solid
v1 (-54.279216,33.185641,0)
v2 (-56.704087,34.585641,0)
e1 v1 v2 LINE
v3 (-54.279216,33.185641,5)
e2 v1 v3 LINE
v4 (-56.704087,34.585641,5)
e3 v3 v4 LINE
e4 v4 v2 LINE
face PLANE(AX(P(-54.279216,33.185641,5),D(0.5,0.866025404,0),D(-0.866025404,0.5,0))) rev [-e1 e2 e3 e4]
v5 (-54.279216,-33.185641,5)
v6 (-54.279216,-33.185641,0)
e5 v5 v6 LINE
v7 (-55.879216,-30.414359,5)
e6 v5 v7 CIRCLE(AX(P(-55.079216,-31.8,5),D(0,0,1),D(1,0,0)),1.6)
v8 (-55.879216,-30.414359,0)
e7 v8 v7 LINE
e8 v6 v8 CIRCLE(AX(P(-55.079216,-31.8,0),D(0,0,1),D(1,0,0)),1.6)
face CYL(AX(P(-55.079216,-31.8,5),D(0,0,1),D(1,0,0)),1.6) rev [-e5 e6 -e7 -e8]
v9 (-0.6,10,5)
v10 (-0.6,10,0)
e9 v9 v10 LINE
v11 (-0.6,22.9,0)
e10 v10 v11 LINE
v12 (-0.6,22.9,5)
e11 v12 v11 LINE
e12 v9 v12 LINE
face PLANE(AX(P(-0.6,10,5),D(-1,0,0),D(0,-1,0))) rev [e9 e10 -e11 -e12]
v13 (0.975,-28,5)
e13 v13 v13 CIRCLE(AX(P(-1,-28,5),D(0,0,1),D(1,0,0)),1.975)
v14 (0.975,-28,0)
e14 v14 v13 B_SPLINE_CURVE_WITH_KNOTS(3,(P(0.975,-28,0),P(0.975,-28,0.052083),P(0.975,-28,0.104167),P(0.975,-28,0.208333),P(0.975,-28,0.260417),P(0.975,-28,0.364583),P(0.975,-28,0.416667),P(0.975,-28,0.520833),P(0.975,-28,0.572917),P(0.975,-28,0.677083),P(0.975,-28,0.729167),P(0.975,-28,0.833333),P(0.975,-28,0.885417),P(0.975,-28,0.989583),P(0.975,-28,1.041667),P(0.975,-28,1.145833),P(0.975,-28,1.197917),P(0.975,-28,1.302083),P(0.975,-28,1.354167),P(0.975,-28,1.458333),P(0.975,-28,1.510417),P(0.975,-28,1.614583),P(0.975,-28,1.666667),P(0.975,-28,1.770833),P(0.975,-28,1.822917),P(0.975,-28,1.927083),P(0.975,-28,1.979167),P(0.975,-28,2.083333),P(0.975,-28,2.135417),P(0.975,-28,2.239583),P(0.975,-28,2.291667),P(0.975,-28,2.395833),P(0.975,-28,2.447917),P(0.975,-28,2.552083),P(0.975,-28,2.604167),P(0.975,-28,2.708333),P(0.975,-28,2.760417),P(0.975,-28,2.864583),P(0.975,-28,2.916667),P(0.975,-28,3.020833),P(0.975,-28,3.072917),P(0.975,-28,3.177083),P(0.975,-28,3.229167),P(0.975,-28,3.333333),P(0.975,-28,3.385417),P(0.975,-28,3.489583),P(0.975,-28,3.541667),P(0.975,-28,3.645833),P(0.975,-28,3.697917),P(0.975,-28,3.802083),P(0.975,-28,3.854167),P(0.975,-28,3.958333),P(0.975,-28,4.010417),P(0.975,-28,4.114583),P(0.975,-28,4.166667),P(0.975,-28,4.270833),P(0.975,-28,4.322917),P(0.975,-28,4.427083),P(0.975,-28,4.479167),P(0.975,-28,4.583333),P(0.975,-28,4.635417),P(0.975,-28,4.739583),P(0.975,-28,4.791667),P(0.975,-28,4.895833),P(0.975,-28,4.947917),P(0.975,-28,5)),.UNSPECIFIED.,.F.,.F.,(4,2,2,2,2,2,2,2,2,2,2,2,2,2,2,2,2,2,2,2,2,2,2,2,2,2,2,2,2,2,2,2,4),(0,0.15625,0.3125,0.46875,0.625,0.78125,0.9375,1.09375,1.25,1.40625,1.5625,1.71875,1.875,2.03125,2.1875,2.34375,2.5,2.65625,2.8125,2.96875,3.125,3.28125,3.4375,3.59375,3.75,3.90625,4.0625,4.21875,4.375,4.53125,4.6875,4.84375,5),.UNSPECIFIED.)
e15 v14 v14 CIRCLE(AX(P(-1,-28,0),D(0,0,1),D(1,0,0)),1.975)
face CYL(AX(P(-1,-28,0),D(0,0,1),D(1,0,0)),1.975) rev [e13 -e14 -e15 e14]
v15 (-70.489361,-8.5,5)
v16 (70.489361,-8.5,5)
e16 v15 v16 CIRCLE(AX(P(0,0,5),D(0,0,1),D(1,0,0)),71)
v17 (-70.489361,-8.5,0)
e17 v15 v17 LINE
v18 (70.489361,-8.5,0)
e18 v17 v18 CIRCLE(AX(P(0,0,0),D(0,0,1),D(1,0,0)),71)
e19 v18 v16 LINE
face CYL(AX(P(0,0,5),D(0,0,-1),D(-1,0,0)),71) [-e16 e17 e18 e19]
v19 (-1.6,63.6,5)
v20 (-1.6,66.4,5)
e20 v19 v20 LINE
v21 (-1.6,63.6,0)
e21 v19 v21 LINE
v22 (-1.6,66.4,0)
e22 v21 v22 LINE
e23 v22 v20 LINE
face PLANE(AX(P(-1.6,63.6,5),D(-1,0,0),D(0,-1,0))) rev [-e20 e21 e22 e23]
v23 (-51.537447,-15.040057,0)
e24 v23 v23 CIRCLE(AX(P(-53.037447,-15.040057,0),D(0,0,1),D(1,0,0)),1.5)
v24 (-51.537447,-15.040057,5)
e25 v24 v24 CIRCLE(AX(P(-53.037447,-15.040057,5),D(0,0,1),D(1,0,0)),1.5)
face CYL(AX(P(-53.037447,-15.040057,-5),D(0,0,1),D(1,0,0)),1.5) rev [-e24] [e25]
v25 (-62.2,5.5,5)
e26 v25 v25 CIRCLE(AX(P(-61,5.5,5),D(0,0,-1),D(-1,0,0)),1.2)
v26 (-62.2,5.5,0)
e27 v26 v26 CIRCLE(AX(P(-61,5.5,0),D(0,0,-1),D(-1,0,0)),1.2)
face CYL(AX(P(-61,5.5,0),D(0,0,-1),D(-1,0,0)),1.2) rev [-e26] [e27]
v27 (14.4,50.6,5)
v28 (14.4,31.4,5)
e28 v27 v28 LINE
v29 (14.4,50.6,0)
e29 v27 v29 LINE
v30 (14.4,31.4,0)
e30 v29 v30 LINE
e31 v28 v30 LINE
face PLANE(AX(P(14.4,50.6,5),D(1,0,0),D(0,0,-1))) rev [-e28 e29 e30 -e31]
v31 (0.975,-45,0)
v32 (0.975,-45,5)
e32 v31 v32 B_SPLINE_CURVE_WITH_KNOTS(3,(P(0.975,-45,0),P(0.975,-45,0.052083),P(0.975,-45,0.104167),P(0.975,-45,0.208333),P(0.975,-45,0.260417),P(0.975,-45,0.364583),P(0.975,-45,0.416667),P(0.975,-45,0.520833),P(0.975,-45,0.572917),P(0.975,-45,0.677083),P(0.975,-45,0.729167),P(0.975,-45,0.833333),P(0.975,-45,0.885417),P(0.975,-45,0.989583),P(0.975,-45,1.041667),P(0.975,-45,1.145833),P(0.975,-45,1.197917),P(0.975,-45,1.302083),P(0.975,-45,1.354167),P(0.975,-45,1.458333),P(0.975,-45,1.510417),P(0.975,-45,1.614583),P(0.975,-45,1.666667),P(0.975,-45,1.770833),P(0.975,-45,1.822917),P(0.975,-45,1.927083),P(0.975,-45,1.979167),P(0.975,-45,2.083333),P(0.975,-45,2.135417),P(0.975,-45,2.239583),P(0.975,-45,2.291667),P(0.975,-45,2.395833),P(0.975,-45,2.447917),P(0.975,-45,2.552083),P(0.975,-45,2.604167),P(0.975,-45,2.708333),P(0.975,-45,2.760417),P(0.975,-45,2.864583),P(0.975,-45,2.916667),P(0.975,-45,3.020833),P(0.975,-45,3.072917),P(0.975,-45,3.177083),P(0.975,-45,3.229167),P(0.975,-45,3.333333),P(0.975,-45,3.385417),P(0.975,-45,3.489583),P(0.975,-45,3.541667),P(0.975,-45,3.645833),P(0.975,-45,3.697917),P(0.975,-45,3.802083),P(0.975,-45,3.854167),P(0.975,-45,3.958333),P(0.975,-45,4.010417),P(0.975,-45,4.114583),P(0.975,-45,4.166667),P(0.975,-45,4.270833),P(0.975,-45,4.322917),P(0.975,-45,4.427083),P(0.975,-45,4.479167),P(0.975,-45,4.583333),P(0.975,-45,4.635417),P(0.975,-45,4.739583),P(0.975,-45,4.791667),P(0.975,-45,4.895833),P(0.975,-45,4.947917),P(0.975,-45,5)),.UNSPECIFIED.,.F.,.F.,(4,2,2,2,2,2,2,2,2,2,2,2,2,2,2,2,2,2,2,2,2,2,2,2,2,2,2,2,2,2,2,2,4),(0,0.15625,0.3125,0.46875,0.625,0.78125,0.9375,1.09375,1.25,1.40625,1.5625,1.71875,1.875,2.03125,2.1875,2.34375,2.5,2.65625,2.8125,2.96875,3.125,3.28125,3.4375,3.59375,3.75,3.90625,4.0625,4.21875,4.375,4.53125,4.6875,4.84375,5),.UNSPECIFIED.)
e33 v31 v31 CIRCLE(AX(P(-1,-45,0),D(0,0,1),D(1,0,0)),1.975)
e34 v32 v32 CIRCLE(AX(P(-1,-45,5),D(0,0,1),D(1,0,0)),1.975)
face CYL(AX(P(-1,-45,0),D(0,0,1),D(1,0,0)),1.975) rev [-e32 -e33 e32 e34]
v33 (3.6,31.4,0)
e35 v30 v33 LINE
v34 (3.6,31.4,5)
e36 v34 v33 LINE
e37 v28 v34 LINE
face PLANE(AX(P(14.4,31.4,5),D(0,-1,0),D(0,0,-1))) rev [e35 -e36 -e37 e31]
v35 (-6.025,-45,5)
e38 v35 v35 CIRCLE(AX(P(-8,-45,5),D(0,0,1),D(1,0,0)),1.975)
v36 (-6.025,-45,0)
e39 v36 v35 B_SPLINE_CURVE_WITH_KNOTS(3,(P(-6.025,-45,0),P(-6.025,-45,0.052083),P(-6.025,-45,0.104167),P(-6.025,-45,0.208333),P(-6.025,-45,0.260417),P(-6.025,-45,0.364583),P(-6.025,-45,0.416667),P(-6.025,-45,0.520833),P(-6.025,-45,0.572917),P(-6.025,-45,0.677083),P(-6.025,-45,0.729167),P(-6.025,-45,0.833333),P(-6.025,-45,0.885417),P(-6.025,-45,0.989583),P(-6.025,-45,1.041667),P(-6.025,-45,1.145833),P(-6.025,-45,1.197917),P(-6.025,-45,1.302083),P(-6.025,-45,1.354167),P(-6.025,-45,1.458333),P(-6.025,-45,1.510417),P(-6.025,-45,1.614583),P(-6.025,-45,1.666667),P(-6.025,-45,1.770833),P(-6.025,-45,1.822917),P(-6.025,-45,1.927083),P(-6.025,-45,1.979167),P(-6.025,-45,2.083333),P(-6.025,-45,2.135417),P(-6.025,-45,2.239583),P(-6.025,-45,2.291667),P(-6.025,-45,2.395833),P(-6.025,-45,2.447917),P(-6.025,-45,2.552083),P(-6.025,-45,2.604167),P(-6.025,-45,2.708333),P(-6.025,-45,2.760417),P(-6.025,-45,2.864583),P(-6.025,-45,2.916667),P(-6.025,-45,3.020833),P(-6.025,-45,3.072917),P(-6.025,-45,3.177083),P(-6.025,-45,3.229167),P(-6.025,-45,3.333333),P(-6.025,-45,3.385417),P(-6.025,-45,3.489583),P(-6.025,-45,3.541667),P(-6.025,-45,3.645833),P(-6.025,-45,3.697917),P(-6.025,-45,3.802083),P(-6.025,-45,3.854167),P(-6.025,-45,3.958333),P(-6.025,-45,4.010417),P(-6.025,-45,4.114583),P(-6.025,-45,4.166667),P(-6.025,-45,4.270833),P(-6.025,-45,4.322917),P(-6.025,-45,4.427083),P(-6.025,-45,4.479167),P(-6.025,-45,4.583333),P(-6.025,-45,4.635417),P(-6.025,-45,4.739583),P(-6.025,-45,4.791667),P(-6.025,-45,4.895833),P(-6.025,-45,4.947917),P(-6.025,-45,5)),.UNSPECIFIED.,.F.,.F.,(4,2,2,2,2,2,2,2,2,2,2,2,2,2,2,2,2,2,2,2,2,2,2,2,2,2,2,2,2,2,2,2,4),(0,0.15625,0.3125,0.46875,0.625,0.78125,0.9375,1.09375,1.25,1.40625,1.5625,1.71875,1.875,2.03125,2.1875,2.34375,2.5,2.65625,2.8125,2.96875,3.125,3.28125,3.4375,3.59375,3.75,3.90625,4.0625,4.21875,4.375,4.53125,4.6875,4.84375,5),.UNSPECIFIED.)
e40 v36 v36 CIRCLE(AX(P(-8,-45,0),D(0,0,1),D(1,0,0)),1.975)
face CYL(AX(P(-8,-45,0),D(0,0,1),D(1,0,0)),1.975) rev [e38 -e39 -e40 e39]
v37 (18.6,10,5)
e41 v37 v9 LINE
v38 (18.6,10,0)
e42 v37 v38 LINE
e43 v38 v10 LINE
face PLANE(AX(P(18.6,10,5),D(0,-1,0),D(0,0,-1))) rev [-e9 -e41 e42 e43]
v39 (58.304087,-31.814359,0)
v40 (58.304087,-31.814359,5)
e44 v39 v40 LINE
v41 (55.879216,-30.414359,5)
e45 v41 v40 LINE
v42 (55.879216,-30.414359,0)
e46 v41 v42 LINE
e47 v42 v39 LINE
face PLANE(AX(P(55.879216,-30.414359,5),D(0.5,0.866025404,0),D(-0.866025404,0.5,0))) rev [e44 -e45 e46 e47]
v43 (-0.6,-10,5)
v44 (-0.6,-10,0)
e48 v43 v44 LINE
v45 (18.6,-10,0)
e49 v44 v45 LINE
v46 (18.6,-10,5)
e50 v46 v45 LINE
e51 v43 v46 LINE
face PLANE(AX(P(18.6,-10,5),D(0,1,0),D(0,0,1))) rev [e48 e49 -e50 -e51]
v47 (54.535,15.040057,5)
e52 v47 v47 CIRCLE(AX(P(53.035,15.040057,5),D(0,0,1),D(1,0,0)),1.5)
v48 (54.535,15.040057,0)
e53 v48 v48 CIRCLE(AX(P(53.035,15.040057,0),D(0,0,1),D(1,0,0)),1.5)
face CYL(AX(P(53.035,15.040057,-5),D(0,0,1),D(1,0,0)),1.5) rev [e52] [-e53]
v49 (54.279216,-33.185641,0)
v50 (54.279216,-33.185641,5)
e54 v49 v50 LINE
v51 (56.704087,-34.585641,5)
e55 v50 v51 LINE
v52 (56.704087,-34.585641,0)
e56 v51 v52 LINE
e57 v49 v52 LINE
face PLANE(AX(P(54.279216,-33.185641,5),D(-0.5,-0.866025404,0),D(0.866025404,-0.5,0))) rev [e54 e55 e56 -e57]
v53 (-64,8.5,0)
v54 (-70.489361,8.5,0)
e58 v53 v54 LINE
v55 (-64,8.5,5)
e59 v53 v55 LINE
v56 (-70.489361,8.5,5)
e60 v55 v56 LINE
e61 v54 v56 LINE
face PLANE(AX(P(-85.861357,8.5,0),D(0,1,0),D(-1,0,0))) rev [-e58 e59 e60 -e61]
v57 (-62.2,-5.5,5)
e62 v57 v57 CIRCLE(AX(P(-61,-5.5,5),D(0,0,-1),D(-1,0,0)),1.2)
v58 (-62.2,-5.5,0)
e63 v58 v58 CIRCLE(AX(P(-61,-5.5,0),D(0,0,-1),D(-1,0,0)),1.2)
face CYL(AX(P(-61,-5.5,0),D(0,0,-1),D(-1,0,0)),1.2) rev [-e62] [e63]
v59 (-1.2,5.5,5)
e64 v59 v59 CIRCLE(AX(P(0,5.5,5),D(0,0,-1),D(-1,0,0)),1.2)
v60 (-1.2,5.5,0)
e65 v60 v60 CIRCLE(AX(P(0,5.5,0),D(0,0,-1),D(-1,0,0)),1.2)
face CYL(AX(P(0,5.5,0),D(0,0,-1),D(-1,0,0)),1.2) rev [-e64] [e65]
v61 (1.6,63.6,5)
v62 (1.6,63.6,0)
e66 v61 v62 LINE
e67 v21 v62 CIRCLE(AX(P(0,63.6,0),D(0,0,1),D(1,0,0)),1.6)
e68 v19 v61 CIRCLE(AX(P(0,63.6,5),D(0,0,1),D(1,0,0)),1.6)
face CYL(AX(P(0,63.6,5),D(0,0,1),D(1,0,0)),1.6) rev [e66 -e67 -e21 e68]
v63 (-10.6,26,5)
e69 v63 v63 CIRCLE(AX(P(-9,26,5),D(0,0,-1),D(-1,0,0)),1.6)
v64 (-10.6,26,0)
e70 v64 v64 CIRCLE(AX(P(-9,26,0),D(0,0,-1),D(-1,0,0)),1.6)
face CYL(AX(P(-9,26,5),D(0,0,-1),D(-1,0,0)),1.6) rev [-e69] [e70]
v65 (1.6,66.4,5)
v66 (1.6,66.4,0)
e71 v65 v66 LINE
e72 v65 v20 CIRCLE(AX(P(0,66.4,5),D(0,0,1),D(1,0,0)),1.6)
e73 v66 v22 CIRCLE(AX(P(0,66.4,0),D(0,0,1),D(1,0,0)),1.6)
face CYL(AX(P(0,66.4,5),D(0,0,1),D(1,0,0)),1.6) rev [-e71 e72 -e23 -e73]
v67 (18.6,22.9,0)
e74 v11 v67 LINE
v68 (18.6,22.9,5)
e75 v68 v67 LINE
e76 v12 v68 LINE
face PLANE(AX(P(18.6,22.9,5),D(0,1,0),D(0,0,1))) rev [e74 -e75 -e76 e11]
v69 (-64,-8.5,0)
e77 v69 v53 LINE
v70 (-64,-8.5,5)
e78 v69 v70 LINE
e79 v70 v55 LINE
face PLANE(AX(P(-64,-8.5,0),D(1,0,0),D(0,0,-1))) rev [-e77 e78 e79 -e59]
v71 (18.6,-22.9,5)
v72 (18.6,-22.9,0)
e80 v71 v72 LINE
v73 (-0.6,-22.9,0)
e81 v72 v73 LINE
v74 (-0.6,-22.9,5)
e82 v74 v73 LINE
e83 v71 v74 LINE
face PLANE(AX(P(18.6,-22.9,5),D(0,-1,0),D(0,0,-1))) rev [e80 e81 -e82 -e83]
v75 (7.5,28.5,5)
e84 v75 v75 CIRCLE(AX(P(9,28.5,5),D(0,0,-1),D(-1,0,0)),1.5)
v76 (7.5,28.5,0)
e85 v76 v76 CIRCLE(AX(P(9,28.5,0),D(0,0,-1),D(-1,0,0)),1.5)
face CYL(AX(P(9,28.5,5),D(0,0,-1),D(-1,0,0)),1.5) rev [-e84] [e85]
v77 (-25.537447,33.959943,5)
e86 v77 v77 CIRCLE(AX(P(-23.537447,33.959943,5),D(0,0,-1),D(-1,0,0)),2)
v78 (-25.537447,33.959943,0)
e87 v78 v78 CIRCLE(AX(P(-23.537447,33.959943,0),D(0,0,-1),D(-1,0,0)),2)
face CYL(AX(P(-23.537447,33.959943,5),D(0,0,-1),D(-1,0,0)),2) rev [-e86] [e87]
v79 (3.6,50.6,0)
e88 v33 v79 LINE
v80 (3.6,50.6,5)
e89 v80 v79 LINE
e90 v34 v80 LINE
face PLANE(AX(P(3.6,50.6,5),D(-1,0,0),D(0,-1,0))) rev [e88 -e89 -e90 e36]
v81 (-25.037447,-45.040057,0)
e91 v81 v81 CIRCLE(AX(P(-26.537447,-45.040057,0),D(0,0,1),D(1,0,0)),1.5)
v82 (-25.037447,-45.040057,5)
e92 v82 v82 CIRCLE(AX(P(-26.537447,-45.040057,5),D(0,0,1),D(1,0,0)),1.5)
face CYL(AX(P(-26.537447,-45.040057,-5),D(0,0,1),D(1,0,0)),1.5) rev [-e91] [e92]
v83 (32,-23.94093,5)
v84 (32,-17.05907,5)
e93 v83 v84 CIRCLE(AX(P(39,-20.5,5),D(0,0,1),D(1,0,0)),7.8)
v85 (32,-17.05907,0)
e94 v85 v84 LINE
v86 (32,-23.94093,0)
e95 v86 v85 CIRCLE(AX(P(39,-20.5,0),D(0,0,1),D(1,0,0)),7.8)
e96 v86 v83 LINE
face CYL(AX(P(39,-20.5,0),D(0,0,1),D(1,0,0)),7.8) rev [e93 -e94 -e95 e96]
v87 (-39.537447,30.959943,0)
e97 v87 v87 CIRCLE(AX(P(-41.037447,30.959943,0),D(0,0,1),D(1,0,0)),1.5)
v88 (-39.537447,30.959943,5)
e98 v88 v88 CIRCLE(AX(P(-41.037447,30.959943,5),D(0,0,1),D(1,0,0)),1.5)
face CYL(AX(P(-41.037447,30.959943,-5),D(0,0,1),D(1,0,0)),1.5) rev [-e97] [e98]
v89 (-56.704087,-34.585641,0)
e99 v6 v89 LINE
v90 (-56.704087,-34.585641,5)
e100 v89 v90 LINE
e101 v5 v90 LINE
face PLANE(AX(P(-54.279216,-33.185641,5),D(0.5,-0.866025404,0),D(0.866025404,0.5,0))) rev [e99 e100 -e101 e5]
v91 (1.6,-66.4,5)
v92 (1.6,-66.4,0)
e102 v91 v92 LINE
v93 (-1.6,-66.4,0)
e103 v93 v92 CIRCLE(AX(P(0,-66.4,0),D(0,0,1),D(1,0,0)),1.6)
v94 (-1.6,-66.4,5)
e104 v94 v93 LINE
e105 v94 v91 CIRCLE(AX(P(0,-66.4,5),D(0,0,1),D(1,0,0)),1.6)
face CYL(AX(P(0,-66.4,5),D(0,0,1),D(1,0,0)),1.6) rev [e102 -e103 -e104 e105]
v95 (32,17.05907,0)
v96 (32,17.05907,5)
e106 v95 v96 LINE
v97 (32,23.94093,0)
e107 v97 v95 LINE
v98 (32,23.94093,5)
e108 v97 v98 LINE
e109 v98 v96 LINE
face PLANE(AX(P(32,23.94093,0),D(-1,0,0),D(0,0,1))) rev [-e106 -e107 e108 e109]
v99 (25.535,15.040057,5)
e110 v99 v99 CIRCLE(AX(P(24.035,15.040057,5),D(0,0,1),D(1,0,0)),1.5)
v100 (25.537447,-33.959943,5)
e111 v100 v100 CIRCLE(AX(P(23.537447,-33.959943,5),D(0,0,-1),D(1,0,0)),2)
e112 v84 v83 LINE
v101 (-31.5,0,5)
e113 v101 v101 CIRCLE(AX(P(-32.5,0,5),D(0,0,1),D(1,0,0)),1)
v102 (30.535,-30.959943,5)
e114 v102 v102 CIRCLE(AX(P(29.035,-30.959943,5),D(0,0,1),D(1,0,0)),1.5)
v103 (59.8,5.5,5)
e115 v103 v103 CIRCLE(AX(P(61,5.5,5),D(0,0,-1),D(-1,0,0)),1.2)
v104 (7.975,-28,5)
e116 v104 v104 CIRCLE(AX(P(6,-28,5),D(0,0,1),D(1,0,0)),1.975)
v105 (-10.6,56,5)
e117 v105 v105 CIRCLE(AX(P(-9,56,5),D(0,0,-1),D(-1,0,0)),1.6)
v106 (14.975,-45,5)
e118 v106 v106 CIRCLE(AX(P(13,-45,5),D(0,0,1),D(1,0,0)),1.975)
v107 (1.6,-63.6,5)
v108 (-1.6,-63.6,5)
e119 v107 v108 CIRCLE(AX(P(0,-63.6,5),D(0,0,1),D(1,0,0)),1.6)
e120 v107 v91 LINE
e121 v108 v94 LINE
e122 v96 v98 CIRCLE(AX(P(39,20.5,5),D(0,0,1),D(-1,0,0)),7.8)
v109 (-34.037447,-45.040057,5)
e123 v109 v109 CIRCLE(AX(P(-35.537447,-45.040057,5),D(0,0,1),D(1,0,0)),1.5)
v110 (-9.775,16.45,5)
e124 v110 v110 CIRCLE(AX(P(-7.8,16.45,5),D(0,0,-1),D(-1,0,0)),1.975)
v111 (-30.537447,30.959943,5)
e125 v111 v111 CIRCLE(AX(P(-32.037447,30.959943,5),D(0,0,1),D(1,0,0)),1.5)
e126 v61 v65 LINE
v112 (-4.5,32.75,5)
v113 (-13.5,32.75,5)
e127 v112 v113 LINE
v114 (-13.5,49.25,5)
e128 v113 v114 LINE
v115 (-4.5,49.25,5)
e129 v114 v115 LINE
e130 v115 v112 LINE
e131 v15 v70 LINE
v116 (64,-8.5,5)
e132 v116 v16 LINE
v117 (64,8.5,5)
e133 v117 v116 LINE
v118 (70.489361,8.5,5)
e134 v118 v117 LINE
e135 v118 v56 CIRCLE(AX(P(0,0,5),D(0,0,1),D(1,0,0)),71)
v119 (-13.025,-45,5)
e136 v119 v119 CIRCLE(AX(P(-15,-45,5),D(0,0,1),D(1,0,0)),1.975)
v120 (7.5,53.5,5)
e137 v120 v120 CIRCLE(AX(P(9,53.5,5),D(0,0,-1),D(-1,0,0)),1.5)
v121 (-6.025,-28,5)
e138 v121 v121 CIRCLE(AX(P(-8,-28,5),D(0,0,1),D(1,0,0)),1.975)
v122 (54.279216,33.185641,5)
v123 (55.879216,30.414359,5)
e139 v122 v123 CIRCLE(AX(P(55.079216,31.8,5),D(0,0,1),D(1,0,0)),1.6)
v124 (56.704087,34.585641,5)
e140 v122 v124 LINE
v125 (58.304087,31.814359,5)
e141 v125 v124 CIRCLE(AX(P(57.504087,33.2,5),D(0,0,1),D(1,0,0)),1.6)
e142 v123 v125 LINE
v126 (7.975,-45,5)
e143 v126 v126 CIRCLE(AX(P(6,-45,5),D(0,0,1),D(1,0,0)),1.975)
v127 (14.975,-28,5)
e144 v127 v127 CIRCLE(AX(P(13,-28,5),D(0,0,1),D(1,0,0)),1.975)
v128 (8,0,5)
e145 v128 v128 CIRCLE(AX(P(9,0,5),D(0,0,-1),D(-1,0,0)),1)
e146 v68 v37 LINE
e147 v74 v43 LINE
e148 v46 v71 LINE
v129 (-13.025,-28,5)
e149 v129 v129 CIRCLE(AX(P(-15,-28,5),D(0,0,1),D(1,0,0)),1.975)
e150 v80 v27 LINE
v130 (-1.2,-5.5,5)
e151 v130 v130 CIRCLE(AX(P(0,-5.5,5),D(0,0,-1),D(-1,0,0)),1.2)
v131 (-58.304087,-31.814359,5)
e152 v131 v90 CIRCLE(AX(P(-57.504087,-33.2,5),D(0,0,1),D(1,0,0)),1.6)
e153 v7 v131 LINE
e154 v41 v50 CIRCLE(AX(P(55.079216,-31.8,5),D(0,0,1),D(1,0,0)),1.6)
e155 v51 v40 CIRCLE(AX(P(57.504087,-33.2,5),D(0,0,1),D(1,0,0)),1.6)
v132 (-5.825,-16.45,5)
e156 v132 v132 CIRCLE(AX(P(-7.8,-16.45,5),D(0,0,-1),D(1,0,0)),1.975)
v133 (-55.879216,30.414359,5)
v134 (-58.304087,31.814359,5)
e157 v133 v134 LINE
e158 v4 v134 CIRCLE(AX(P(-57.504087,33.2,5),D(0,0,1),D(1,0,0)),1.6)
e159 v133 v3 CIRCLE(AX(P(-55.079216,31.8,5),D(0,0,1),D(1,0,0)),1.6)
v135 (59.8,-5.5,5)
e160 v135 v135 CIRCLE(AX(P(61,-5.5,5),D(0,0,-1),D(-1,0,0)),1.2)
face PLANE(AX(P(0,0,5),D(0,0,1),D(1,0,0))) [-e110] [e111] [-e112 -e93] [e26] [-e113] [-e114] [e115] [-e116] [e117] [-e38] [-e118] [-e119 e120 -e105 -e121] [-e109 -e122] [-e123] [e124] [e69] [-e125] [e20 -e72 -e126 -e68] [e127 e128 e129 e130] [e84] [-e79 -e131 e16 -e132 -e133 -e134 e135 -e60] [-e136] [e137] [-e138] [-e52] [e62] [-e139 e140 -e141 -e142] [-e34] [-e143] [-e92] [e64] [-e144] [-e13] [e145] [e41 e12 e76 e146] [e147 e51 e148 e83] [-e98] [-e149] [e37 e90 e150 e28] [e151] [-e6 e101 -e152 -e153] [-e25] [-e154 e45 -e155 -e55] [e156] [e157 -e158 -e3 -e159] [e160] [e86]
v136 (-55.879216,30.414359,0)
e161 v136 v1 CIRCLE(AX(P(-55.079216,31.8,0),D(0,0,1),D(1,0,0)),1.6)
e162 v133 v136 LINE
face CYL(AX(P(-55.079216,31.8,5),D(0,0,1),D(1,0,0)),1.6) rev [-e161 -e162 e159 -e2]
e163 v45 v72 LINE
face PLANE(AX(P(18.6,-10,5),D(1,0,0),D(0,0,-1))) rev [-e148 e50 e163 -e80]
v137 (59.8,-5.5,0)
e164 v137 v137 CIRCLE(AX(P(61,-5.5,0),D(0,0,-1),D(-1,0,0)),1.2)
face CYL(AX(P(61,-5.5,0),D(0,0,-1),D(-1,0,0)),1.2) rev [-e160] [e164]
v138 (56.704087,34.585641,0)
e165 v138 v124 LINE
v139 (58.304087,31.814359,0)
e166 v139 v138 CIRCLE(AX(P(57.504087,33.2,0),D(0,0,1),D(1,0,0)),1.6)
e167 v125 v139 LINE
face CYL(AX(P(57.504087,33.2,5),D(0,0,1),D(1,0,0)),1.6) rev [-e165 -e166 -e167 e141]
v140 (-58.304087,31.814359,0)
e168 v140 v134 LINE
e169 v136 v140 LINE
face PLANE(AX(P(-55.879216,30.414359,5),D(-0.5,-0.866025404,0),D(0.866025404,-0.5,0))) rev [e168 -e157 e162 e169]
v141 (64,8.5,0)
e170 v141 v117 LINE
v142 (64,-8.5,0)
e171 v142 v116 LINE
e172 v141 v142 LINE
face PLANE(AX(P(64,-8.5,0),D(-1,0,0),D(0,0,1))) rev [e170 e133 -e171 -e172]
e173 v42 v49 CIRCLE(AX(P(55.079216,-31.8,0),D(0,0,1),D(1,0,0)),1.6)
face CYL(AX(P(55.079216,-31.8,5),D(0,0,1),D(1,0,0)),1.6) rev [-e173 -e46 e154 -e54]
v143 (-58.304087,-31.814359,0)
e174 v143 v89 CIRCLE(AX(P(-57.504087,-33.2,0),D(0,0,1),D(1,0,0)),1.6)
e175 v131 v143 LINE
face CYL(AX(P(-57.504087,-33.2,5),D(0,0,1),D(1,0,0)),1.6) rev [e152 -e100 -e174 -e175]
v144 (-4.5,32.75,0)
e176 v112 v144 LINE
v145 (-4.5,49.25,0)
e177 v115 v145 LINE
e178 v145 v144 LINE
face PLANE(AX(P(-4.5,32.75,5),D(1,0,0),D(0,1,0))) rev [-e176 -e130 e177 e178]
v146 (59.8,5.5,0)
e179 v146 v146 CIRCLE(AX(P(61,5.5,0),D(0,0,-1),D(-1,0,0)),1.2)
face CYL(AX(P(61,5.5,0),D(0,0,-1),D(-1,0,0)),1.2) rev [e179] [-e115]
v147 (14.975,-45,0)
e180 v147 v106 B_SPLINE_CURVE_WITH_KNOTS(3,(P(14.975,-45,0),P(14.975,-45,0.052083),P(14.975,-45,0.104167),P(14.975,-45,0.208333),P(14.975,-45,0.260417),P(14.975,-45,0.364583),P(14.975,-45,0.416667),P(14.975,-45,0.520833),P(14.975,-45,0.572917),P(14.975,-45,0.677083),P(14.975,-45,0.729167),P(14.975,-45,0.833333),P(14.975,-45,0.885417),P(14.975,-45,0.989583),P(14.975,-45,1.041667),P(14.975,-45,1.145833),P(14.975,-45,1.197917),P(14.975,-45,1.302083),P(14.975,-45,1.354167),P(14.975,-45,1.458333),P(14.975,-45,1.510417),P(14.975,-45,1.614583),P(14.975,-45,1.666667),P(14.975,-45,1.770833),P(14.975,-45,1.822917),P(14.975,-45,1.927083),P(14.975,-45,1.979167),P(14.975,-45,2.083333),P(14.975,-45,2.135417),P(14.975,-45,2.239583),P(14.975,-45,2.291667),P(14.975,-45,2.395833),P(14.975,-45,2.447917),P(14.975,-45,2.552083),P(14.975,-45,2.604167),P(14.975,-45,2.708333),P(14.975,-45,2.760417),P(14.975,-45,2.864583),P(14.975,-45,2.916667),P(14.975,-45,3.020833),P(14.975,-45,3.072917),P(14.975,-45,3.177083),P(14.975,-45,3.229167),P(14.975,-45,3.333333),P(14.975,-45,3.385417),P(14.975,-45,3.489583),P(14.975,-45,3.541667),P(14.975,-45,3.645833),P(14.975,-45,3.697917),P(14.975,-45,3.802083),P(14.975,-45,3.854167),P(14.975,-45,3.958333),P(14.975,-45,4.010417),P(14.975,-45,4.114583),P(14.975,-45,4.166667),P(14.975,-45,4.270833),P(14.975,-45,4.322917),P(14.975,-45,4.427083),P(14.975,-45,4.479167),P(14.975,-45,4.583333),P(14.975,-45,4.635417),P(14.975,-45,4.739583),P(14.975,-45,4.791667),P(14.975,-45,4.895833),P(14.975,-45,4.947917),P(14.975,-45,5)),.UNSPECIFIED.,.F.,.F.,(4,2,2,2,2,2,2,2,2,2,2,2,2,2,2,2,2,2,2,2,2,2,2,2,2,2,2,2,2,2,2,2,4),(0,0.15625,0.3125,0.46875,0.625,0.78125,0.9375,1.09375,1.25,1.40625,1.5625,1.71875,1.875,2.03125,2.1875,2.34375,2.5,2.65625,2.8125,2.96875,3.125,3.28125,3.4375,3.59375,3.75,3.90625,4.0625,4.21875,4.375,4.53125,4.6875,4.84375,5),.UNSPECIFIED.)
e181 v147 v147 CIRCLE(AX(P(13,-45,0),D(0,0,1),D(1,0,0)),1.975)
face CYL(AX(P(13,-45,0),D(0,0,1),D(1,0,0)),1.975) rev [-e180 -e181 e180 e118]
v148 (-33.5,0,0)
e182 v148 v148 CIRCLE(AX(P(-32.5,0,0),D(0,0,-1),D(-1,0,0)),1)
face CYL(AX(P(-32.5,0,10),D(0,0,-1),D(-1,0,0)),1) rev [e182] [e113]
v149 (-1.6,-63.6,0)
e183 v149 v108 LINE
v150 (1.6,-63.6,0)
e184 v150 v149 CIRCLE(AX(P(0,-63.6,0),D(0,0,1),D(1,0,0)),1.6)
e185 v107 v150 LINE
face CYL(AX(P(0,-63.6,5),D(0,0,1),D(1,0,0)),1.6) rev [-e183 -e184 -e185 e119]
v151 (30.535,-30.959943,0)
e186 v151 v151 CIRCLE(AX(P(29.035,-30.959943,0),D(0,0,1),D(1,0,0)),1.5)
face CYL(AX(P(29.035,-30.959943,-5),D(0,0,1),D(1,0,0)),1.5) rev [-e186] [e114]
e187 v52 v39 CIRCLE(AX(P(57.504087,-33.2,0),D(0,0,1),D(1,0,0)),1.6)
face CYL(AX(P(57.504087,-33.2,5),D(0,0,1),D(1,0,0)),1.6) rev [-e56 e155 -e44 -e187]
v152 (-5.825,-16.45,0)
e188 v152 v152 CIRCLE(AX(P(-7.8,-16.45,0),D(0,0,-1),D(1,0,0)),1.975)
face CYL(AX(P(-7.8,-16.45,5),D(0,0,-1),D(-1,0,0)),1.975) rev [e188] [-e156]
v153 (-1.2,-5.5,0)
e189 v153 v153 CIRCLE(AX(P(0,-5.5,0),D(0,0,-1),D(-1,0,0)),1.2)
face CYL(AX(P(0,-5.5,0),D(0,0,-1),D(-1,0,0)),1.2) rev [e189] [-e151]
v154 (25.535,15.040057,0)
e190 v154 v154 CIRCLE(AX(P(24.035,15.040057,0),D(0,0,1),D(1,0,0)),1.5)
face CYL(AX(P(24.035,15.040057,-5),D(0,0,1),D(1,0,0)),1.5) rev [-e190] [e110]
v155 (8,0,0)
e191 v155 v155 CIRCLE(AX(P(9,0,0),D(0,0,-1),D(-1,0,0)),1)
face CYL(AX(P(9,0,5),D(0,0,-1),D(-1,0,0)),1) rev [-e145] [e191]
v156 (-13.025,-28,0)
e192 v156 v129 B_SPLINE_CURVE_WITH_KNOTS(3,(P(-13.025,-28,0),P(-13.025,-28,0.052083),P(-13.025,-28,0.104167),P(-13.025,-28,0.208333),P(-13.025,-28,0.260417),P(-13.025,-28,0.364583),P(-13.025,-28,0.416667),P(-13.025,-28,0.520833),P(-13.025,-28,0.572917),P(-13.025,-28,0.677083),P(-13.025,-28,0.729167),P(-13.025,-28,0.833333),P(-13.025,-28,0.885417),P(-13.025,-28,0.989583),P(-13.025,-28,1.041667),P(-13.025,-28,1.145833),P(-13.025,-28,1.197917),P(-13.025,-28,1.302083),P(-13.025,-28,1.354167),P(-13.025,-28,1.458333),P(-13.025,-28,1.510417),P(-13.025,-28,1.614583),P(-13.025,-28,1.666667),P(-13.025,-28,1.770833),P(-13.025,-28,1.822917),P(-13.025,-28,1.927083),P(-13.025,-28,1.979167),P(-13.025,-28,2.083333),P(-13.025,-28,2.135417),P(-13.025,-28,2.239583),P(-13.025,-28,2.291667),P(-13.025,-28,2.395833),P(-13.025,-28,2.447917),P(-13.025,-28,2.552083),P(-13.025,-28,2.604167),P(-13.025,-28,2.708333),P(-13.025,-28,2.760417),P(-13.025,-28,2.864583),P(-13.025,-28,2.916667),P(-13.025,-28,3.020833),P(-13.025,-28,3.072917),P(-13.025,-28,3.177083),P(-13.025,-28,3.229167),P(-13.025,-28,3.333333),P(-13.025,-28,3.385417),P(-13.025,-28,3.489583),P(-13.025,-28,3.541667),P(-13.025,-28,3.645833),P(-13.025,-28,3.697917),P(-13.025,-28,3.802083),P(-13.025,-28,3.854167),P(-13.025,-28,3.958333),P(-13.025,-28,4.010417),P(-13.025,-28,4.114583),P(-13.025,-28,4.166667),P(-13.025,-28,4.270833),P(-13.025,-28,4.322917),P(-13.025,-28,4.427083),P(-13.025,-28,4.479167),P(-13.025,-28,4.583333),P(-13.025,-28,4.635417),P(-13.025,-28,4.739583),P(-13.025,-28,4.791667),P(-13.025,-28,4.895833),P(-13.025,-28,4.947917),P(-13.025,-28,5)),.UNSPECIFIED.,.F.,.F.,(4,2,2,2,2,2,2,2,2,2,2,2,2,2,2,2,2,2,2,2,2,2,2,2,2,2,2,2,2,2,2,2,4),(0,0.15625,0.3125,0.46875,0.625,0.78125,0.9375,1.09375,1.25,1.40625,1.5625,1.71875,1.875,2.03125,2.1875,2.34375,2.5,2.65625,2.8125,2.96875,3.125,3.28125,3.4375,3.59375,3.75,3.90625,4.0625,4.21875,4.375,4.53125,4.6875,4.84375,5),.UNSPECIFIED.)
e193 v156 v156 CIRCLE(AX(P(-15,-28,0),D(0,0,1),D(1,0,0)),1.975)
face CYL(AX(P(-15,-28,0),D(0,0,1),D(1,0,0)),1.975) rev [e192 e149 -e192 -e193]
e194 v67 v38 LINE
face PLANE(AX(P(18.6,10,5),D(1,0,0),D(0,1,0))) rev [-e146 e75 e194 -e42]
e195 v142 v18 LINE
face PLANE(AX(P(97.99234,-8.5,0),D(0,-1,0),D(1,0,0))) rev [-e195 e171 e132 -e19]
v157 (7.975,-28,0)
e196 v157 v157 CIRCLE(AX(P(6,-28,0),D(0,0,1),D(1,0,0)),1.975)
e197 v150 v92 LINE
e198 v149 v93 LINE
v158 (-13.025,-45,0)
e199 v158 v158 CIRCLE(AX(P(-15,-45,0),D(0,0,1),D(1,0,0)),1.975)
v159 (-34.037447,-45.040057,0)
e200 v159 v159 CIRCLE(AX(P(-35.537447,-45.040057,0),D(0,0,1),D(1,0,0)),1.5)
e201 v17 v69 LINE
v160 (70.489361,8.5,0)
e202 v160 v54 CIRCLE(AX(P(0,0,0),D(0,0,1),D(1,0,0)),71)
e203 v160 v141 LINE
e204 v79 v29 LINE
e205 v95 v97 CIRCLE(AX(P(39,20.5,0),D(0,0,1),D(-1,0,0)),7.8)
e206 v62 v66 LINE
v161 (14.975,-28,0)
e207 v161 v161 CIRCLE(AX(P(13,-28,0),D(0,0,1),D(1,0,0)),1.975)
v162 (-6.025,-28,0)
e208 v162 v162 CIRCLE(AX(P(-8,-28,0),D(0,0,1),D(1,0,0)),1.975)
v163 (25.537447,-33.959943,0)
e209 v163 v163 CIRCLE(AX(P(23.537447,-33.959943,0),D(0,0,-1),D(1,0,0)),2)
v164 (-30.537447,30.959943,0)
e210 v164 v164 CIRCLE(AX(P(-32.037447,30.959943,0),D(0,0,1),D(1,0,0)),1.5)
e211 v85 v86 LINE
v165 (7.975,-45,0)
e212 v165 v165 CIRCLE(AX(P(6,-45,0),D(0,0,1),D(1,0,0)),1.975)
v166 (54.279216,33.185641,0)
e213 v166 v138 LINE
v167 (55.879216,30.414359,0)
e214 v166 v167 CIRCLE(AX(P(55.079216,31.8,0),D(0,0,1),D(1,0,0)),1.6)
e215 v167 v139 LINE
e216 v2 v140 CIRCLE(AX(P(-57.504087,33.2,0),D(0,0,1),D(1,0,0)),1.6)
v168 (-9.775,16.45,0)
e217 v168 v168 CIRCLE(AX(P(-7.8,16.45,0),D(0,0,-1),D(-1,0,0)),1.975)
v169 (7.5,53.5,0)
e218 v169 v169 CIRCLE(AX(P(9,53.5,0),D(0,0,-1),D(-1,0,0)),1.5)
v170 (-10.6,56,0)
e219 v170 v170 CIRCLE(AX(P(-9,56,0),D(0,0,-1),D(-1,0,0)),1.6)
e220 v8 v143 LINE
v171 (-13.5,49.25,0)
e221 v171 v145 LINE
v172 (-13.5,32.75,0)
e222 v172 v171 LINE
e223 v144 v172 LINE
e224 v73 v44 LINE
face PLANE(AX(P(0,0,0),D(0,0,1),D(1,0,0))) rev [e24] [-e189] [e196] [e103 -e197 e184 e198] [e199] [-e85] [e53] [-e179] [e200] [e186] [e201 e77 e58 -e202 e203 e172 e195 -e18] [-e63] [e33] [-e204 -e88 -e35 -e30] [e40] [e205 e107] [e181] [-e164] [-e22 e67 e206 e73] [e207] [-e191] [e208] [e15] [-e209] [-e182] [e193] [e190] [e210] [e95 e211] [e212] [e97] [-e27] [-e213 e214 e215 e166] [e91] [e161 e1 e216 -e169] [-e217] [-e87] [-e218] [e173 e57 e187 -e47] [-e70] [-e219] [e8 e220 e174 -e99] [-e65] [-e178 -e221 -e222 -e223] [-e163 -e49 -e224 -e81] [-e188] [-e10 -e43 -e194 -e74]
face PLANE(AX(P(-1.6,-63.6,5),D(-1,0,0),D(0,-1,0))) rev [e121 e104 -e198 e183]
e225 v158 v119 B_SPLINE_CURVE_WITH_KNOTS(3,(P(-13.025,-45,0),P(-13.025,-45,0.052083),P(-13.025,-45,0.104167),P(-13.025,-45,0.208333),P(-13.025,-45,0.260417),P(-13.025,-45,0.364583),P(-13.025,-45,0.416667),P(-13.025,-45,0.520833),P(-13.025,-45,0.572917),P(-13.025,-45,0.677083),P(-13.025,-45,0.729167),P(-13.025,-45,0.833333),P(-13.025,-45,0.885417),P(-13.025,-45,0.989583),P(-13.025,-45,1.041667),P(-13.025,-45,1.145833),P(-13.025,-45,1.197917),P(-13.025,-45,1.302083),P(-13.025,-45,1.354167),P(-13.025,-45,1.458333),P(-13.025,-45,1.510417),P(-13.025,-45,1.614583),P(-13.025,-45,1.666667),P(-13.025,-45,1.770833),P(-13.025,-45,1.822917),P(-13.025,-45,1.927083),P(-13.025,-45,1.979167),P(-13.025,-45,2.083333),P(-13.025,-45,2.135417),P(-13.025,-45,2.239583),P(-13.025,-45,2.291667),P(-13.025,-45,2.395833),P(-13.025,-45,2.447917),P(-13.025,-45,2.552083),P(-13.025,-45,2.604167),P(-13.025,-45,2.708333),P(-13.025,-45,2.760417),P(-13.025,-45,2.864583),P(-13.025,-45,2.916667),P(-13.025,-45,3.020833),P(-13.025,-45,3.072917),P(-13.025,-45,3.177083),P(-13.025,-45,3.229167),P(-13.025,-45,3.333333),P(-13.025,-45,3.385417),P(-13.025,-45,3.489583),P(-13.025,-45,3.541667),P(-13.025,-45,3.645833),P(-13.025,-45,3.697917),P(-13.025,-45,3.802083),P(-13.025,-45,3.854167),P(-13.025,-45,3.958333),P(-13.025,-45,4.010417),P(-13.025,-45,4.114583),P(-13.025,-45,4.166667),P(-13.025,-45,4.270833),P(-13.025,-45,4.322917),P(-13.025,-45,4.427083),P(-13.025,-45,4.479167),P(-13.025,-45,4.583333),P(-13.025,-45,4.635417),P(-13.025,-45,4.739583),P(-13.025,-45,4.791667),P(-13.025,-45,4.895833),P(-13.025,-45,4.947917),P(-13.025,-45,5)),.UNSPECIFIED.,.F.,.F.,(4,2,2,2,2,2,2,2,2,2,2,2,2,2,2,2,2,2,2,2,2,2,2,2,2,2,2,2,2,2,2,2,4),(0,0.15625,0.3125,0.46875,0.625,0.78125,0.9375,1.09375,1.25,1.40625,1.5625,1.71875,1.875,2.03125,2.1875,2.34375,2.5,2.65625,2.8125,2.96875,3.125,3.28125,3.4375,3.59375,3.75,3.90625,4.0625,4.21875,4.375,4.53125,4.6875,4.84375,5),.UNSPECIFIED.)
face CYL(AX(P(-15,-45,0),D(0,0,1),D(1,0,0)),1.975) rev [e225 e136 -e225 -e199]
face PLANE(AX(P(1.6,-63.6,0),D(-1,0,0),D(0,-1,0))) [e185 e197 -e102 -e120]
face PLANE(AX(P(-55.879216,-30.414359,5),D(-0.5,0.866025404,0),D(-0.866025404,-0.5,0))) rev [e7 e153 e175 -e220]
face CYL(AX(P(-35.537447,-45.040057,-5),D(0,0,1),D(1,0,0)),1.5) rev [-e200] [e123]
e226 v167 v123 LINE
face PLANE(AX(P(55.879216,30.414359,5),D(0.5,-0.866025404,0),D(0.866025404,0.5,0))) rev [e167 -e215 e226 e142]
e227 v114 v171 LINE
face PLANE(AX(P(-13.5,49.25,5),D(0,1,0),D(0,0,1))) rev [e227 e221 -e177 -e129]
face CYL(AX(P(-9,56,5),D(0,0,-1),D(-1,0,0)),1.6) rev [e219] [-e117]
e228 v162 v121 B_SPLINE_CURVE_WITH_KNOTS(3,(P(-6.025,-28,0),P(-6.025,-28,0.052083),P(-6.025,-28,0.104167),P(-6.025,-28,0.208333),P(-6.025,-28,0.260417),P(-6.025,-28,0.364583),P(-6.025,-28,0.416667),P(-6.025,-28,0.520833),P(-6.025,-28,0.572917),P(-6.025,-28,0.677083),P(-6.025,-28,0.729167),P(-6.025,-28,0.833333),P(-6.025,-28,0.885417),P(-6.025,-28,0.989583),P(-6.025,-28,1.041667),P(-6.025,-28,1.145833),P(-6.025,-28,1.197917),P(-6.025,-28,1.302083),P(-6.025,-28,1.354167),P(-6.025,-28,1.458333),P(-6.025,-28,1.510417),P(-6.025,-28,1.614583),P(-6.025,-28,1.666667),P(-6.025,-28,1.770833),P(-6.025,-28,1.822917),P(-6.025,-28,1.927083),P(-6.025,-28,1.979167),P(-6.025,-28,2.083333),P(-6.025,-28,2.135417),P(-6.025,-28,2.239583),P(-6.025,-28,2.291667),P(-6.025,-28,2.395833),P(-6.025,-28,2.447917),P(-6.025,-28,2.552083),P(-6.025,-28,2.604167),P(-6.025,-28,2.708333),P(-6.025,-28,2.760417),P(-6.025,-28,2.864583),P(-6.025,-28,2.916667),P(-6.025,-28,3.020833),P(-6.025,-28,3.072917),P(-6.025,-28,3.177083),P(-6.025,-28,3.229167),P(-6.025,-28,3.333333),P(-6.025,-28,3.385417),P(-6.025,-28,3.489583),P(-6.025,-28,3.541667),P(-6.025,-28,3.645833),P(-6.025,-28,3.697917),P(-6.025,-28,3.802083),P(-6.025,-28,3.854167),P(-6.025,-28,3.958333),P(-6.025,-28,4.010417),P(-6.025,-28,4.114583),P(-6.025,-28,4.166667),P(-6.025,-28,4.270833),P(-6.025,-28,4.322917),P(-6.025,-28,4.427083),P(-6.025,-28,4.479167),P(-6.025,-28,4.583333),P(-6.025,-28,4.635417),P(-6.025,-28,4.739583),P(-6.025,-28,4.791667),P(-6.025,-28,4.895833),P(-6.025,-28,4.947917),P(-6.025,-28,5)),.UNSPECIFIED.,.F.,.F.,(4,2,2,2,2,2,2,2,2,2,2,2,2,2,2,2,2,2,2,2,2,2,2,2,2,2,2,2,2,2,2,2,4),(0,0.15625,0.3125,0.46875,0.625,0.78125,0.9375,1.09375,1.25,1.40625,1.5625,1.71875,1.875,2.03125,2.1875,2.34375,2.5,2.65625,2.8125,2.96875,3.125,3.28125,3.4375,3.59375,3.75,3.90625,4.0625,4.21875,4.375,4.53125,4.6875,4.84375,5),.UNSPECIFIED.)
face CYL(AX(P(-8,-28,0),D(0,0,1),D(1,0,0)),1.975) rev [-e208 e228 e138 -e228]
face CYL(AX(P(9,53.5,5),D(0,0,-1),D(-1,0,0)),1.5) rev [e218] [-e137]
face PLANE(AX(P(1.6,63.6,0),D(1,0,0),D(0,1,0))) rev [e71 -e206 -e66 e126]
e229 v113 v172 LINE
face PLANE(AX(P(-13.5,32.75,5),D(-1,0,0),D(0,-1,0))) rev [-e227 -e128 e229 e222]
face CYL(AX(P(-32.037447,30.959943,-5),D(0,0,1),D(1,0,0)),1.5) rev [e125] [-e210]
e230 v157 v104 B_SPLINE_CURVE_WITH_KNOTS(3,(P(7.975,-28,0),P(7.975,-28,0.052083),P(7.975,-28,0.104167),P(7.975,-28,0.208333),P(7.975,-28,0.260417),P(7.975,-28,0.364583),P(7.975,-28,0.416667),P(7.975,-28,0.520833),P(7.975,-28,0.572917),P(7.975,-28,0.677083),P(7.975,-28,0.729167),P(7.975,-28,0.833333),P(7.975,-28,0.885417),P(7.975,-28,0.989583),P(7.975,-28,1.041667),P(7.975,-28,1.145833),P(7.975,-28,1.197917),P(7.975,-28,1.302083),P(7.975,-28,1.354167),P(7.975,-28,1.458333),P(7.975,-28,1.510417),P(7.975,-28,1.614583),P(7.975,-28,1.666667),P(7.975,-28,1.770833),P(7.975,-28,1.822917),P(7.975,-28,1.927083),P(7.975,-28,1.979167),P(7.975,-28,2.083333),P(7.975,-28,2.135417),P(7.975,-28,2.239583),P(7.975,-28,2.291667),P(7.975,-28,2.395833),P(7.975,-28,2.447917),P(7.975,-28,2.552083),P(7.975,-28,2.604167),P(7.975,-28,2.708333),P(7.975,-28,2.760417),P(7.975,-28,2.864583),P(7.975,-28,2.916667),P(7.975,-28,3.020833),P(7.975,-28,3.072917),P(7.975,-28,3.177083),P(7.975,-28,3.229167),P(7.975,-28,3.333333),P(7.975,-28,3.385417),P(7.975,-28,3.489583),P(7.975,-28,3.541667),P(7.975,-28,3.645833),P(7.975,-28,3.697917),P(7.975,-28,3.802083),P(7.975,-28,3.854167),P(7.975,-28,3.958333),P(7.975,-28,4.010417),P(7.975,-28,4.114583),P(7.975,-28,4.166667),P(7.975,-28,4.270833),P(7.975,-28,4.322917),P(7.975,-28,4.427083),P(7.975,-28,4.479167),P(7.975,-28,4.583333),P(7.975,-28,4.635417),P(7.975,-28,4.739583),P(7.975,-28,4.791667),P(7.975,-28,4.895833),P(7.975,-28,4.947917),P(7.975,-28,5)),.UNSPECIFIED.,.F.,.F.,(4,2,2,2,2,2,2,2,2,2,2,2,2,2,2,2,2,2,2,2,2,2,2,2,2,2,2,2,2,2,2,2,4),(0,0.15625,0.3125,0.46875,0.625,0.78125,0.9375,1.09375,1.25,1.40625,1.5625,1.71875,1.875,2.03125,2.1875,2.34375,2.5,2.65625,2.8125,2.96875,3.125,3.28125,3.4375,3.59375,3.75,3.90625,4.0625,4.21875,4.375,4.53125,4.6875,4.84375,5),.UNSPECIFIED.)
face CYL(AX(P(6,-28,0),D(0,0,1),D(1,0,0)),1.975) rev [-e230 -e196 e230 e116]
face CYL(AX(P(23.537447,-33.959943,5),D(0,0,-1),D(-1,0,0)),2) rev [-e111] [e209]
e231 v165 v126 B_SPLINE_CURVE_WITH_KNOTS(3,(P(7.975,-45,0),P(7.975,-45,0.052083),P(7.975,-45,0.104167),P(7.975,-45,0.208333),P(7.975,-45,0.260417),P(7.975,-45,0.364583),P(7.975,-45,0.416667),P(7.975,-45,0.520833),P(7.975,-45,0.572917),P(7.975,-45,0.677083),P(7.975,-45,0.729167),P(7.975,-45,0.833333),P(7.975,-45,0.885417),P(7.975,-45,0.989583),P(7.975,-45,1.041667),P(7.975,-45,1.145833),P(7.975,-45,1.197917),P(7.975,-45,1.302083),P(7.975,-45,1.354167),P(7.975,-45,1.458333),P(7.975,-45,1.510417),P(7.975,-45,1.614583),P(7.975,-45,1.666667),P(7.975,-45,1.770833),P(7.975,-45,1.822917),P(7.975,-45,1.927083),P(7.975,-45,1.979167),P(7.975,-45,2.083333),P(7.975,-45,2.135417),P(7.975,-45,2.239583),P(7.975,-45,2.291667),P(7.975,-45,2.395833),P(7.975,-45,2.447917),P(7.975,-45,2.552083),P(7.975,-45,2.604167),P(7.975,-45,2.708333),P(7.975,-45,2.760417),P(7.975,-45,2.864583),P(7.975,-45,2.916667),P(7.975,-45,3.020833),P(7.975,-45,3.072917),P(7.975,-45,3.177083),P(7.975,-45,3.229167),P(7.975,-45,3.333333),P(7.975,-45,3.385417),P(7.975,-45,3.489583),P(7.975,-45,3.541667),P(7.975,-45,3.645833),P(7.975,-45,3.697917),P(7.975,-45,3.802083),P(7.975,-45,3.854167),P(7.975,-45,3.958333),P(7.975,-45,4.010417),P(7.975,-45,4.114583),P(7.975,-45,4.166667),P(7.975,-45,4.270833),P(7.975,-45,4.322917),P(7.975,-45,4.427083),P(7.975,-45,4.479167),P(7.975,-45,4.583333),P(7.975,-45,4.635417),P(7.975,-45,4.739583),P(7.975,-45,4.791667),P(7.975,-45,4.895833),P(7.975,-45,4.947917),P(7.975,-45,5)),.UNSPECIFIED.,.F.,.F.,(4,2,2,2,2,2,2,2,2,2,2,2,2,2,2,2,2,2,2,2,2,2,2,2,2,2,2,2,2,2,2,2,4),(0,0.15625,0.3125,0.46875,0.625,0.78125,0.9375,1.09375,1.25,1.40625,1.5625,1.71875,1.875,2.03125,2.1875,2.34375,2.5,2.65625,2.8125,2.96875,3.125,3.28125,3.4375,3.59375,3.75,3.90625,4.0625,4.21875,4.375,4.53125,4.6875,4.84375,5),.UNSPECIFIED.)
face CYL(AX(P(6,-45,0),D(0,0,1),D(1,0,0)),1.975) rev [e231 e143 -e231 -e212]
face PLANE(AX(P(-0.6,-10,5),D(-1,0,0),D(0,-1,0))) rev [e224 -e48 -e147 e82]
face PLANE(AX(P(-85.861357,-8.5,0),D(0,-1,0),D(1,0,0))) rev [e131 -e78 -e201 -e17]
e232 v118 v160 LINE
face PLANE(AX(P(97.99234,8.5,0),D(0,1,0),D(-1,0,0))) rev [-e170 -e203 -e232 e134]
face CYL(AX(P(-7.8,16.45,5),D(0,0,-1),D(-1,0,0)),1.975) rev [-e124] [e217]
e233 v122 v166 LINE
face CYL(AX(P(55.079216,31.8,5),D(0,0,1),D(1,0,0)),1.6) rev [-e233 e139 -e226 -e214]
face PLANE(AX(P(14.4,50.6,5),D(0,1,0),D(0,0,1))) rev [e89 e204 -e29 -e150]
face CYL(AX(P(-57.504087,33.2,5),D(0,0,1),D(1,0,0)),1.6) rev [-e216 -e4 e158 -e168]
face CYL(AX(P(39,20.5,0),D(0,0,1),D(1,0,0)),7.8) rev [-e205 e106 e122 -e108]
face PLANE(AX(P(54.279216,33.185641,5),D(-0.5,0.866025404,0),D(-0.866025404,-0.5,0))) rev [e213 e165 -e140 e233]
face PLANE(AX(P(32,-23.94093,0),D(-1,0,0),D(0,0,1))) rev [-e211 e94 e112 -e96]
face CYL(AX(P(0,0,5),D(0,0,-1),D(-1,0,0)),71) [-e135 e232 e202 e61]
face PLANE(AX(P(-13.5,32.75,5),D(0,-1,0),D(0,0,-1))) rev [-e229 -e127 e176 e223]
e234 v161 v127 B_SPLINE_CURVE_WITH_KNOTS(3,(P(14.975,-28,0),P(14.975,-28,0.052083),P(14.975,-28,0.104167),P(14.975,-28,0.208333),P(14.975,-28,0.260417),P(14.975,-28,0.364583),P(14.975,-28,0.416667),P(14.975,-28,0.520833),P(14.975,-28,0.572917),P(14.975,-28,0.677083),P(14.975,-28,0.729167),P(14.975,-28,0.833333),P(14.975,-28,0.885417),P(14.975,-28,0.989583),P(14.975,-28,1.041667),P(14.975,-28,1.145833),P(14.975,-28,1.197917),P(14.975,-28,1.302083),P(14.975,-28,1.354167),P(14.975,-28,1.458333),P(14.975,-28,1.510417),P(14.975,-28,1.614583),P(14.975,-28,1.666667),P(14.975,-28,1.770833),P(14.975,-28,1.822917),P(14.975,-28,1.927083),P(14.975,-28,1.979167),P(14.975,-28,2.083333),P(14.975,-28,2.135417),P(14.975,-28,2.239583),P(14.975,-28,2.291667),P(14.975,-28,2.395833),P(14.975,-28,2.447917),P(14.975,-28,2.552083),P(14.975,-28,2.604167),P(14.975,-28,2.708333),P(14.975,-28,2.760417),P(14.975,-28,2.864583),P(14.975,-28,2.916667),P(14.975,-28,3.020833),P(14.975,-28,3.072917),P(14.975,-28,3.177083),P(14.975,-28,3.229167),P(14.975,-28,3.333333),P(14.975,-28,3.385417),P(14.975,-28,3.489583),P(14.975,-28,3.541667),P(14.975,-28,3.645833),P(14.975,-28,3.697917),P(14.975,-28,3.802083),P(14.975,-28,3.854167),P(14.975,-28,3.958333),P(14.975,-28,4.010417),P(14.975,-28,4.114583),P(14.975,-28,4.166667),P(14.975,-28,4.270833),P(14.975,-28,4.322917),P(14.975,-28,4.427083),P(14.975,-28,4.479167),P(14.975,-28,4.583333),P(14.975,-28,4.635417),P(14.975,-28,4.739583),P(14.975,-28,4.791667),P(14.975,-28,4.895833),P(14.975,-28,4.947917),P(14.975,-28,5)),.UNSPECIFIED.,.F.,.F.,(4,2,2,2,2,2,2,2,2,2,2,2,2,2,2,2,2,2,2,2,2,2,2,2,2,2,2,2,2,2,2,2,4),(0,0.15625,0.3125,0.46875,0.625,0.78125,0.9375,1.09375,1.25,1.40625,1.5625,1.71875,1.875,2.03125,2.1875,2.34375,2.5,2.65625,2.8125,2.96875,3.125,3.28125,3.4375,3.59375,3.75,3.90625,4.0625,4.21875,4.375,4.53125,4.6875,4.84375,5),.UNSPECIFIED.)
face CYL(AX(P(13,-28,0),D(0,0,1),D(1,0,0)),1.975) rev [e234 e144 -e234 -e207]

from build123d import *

# Parameters (mm, degrees)
ESQUISSE1_R                     = 71
BOSS_EXTRU_1_DEPTH              = 5
ESQUISSE2_W                     = 33.992340046
ESQUISSE2_H                     = 17
ESQUISSE2_W_2                   = 21.861356716
ENL_V_MAT_EXTRU_1_DEPTH         = 101.533576481
D_GAGEMENT_M21_D                = 2.4
R_P_TITION_LIN_AIRE1_COUNT      = 3
R_P_TITION_LIN_AIRE1_PITCH      = 61
R_P_TITION_LIN_AIRE1_COUNT_DIR2 = 2
R_P_TITION_LIN_AIRE1_PITCH_DIR2 = 11
ESQUISSE7_R                     = 1
ENL_V_MAT_EXTRU_2_DEPTH         = 10
ENL_V_MAT_EXTRU_3_DEPTH         = 101.173599316
D_GAGEMENT_M25_DEPTH            = 5
R_P_TITION_CIRCULAIRE1_COUNT    = 6
ESQUISSE11_R                    = 1.6
ESQUISSE11_R_2                  = 1.5
ESQUISSE11_R_3                  = 1.975
ESQUISSE11_R_4                  = 1
ESQUISSE11_W                    = 19.2
ESQUISSE11_H                    = 12.9
ESQUISSE11_W_2                  = 9
ESQUISSE11_H_2                  = 16.5
ESQUISSE11_W_3                  = 10.8
ESQUISSE11_H_3                  = 19.2
ENL_V_MAT_EXTRU_4_DEPTH         = 101.173599316
ESQUISSE12_R                    = 1.975
ENL_V_MAT_EXTRU_5_DEPTH         = 101.173599316
R_P_TITION_LIN_AIRE3_COUNT      = 5
R_P_TITION_LIN_AIRE3_PITCH      = 7
R_P_TITION_LIN_AIRE3_COUNT_DIR2 = 2
R_P_TITION_LIN_AIRE3_PITCH_DIR2 = 17
ESQUISSE13_R                    = 2
ENL_V_MAT_EXTRU_6_DEPTH         = 101.173599316
R_P_TITION_CIRCULAIRE2_COUNT    = 2
ESQUISSE15_R                    = 1.5
ENL_V_MAT_EXTRU_8_DEPTH         = 10


# Read off the part's stored shape, not the designer's step: Dégagement M25
with BuildPart() as part:
    # Esquisse1 → Boss.-Extru.1 (new body)
    with BuildSketch(Plane.XY):
        Circle(ESQUISSE1_R)
    extrude(amount=BOSS_EXTRU_1_DEPTH)

    # Esquisse2 → Enlèv. mat.-Extru.1 (cut, through all)
    with BuildSketch(Plane.XY.offset(5)):
        with Locations((80.996170023, 0)):
            Rectangle(ESQUISSE2_W, ESQUISSE2_H)
        with Locations((-74.930678358, 0)):
            Rectangle(ESQUISSE2_W_2, ESQUISSE2_H)
    extrude(amount=-ENL_V_MAT_EXTRU_1_DEPTH, mode=Mode.SUBTRACT)

    # Dégagement M21 (through all)
    with Locations(Plane(origin=(0, 0, 0), x_dir=(-1, 0, 0), z_dir=(0, 0, -1))):
        with Locations((-61, -5.5)):
            d_gagement_m21 = Hole(D_GAGEMENT_M21_D / 2)

    # Répétition linéaire1: D_gagement M21 3 × 2
    with Locations(*[(-i * R_P_TITION_LIN_AIRE1_PITCH, j * R_P_TITION_LIN_AIRE1_PITCH_DIR2, 0) for i in range(R_P_TITION_LIN_AIRE1_COUNT) for j in range(R_P_TITION_LIN_AIRE1_COUNT_DIR2) if (i, j) != (0, 0)]):
        add(d_gagement_m21, mode=Mode.SUBTRACT)

    # Esquisse7 → Enlèv. mat.-Extru.2 (cut)
    with BuildSketch(Plane(origin=(0, 0, 0), x_dir=(-1, 0, 0), z_dir=(0, 0, -1))):
        with Locations((32.5, 0)):
            Circle(ESQUISSE7_R)
    extrude(amount=-ENL_V_MAT_EXTRU_2_DEPTH, mode=Mode.SUBTRACT)

    # Esquisse8 → Enlèv. mat.-Extru.3 (cut, through all)
    with BuildSketch(Plane.XY.offset(5)):
        with BuildLine():
            Line((32, 23.940930107), (32, 17.059069893))
            ThreePointArc((32, 17.059069893), (46.8, 20.5), (32, 23.940930107))
        make_face()
        with BuildLine():
            Line((32, -23.940930107), (32, -17.059069893))
            ThreePointArc((32, -17.059069893), (46.8, -20.5), (32, -23.940930107))
        make_face()
    extrude(amount=-ENL_V_MAT_EXTRU_3_DEPTH, mode=Mode.SUBTRACT)

    # Dégagement M25 outline → Dégagement M25 (cut)
    with BuildSketch(Plane.XY):
        with BuildLine():
            Line((54.279215681, -33.185640646), (56.704086811, -34.585640646))
            ThreePointArc((56.704086811, -34.585640646), (58.889727457, -34), (58.304086811, -31.814359354))
            Line((58.304086811, -31.814359354), (55.879215681, -30.414359354))
            ThreePointArc((55.879215681, -30.414359354), (53.693575035, -31), (54.279215681, -33.185640646))
        make_face()
    d_gagement_m25 = extrude(amount=D_GAGEMENT_M25_DEPTH, mode=Mode.SUBTRACT)

    # Répétition circulaire1: Dégagement M25 ×6 about axis
    r_p_tition_circulaire1_axis = Axis((0, 0, 0), (0, 0, 1))
    for i in range(1, R_P_TITION_CIRCULAIRE1_COUNT):
        add(d_gagement_m25.rotate(r_p_tition_circulaire1_axis, i * 360 / R_P_TITION_CIRCULAIRE1_COUNT), mode=Mode.SUBTRACT)

    # Esquisse11 → Enlèv. mat.-Extru.4 (cut, through all)
    with BuildSketch(Plane(origin=(0, 0, 0), x_dir=(-1, 0, 0), z_dir=(0, 0, -1))):
        with Locations((9, 26)):
            Circle(ESQUISSE11_R)
        with Locations((9, 56)):
            Circle(ESQUISSE11_R)
        with Locations((-9, 28.5)):
            Circle(ESQUISSE11_R_2)
        with Locations((-9, 53.5)):
            Circle(ESQUISSE11_R_2)
        with Locations((7.8, 16.45)):
            Circle(ESQUISSE11_R_3)
        with Locations(Location((7.8, -16.45, 0), (0, 0, 180))):
            Circle(ESQUISSE11_R_3)
        with Locations((-9, 0)):
            Circle(ESQUISSE11_R_4)
        with Locations((-9, -16.45)):
            Rectangle(ESQUISSE11_W, ESQUISSE11_H)
        with Locations((-9, 16.45)):
            Rectangle(ESQUISSE11_W, ESQUISSE11_H)
        with Locations((9, 41)):
            Rectangle(ESQUISSE11_W_2, ESQUISSE11_H_2)
        with Locations((-9, 41)):
            Rectangle(ESQUISSE11_W_3, ESQUISSE11_H_3)
    extrude(amount=-ENL_V_MAT_EXTRU_4_DEPTH, mode=Mode.SUBTRACT)

    # Esquisse12 → Enlèv. mat.-Extru.5 (cut, through all)
    with BuildSketch(Plane.XY.offset(5)):
        with Locations((-15, -45)):
            Circle(ESQUISSE12_R)
    enl_v_mat_extru_5 = extrude(amount=-ENL_V_MAT_EXTRU_5_DEPTH, mode=Mode.SUBTRACT)

    # Répétition linéaire3: Enl_v. mat.-Extru.5 5 × 2
    with Locations(*[(i * R_P_TITION_LIN_AIRE3_PITCH, j * R_P_TITION_LIN_AIRE3_PITCH_DIR2, 0) for i in range(R_P_TITION_LIN_AIRE3_COUNT) for j in range(R_P_TITION_LIN_AIRE3_COUNT_DIR2) if (i, j) != (0, 0)]):
        add(enl_v_mat_extru_5, mode=Mode.SUBTRACT)

    # Esquisse13 → Enlèv. mat.-Extru.6 (cut, through all)
    with BuildSketch(Plane(origin=(0, 0, 0), x_dir=(-1, 0, 0), z_dir=(0, 0, -1))):
        with Locations((23.5374475, 33.959943273)):
            Circle(ESQUISSE13_R)
    enl_v_mat_extru_6 = extrude(amount=-ENL_V_MAT_EXTRU_6_DEPTH, mode=Mode.SUBTRACT)

    # Répétition circulaire2: Enlèv. mat.-Extru.6 ×2 about axis
    r_p_tition_circulaire2_axis = Axis((0, 0, 0), (0, 0, 1))
    for i in range(1, R_P_TITION_CIRCULAIRE2_COUNT):
        add(enl_v_mat_extru_6.rotate(r_p_tition_circulaire2_axis, i * 360 / R_P_TITION_CIRCULAIRE2_COUNT), mode=Mode.SUBTRACT)

    # Esquisse15 → Enlèv. mat.-Extru.8 (cut)
    with BuildSketch(Plane.XY.offset(5)):
        with Locations((53.035, 15.040056727)):
            Circle(ESQUISSE15_R)
        with Locations((24.035, 15.040056727)):
            Circle(ESQUISSE15_R)
        with Locations((29.035, -30.959943273)):
            Circle(ESQUISSE15_R)
        with Locations((-35.5374475, -45.040056727)):
            Circle(ESQUISSE15_R)
        with Locations((-26.5374475, -45.040056727)):
            Circle(ESQUISSE15_R)
        with Locations((-41.0374475, 30.959943273)):
            Circle(ESQUISSE15_R)
        with Locations((-32.0374475, 30.959943273)):
            Circle(ESQUISSE15_R)
        with Locations((-53.0374475, -15.040056727)):
            Circle(ESQUISSE15_R)
    extrude(amount=-ENL_V_MAT_EXTRU_8_DEPTH, mode=Mode.SUBTRACT)


solid = part.part
